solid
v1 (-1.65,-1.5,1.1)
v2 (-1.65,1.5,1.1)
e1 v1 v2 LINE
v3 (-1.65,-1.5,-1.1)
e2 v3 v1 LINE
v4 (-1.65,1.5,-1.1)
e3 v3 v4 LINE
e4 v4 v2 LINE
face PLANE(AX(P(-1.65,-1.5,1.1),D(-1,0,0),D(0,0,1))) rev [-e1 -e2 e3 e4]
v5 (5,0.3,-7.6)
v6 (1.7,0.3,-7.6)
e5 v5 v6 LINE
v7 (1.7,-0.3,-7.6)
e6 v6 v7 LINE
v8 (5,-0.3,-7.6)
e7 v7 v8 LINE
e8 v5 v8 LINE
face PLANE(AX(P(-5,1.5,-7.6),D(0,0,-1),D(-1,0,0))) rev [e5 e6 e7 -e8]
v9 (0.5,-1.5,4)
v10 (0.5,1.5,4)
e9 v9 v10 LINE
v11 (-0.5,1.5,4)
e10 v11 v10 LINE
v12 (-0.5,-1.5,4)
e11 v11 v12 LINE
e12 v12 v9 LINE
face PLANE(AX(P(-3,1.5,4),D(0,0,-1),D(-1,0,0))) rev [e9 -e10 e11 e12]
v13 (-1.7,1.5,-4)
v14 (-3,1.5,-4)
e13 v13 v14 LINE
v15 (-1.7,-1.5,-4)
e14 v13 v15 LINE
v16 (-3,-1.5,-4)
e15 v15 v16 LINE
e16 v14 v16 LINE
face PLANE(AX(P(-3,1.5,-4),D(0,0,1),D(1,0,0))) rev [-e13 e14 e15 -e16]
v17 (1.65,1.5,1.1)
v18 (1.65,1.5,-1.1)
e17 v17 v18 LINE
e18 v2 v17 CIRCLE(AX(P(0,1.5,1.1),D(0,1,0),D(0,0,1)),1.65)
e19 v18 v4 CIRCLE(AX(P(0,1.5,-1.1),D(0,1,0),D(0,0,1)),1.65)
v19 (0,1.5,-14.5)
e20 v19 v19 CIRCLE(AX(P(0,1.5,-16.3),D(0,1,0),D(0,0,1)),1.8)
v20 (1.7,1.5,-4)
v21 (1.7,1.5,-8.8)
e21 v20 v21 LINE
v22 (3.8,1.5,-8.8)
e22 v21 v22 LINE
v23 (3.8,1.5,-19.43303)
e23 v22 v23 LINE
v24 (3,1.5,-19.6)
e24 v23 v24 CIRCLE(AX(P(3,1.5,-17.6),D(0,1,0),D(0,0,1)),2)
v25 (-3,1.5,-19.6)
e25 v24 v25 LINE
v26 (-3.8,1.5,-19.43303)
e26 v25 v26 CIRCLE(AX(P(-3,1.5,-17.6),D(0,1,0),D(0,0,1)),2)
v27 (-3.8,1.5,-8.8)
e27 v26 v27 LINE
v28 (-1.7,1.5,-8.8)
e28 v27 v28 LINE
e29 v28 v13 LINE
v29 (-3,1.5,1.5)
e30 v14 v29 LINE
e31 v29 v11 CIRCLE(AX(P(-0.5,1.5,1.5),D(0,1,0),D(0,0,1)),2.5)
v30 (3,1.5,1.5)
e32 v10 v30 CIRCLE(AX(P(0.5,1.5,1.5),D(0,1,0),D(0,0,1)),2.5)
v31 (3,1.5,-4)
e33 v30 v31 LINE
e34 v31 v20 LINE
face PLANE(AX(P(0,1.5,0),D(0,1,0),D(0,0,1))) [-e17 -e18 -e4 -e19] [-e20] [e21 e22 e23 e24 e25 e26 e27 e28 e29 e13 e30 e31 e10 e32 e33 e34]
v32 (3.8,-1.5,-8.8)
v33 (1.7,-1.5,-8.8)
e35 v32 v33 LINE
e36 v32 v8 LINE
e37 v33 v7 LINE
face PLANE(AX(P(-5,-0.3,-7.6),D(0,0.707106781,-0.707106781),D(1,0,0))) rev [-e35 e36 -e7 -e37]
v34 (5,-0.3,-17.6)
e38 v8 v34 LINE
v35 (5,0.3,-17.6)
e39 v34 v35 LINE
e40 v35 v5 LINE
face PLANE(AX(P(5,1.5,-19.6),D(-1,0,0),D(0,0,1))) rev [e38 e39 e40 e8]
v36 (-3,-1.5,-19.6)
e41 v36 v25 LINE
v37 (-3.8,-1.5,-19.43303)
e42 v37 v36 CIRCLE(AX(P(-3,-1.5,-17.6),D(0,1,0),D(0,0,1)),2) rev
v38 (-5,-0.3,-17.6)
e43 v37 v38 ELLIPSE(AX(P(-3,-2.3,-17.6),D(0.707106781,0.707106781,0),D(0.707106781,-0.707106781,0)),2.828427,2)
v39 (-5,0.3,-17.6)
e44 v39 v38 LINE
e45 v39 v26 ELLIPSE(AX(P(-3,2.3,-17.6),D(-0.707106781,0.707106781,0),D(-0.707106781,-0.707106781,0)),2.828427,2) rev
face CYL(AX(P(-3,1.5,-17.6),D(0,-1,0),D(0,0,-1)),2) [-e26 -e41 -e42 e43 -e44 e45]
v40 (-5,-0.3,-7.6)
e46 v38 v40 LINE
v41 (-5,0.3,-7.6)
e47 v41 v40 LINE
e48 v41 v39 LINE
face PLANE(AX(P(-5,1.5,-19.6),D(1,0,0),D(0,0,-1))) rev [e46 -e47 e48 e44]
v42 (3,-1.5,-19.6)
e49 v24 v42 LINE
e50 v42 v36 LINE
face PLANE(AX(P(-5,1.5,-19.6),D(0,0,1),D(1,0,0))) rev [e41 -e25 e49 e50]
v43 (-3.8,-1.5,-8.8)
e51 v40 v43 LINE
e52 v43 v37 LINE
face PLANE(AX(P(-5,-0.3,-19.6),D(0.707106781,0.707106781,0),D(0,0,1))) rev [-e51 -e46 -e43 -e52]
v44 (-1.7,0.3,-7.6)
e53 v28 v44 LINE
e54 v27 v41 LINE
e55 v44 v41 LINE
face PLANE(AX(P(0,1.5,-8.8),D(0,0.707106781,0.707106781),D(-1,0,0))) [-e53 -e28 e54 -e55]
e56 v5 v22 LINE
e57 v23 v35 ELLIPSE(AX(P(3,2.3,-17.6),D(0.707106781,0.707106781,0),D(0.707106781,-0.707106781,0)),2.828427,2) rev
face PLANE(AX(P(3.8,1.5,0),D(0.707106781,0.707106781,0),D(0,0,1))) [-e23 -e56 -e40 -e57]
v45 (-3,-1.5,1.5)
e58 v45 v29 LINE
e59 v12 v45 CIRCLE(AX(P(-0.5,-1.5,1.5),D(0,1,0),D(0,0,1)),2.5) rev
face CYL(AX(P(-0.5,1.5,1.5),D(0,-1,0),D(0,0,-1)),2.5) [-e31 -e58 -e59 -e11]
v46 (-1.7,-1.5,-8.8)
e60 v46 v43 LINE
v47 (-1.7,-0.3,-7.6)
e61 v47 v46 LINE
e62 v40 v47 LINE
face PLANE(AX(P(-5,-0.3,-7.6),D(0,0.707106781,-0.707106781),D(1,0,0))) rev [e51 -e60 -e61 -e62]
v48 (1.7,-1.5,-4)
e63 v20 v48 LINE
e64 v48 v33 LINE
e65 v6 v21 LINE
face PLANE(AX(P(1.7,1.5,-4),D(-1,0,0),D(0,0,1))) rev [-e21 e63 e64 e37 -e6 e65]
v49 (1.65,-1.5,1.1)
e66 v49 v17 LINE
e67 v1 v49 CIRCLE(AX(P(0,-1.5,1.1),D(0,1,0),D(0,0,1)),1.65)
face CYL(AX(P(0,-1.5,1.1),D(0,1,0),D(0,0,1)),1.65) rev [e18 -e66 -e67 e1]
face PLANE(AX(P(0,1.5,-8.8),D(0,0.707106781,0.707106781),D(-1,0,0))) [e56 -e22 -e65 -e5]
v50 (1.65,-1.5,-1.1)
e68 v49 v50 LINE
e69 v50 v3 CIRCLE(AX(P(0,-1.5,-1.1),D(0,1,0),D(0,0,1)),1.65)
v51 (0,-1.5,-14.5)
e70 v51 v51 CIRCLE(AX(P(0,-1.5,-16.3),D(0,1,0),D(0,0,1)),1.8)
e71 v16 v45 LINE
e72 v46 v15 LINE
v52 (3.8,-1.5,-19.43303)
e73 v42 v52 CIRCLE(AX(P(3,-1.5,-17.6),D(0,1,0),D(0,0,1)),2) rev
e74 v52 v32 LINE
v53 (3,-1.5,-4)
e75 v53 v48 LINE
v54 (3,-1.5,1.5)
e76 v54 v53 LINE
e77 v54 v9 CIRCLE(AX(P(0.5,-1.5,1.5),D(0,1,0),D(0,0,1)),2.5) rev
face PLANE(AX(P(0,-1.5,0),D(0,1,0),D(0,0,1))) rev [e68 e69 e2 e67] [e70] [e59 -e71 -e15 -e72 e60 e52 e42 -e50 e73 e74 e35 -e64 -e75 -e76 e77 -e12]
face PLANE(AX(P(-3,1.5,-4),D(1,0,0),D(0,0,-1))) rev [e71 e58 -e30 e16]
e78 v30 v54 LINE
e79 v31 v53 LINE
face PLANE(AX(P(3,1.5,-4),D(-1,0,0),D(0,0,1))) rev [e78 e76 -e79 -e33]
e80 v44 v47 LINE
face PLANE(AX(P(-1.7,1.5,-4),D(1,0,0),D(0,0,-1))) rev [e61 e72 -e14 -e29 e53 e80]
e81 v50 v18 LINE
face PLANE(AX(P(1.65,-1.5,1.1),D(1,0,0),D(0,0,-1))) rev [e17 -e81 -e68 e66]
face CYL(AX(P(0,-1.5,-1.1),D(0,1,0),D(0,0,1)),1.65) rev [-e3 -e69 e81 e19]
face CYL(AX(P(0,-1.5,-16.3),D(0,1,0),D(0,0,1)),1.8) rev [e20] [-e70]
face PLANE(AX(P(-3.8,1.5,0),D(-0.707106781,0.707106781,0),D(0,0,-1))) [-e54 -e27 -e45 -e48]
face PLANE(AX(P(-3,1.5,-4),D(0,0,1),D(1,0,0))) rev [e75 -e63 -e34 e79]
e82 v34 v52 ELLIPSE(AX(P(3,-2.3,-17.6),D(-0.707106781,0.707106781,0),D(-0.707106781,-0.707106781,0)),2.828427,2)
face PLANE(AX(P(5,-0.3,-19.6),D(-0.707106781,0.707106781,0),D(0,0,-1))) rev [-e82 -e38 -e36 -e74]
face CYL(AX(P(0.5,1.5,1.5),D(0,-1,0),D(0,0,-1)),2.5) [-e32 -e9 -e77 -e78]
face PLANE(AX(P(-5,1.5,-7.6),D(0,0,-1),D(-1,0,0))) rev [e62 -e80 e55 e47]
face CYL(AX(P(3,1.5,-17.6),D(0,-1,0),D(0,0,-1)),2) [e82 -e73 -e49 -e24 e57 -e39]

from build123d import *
from OCP.BRepFilletAPI import BRepFilletAPI_MakeFillet

# Parameters (mm, degrees)
SKETCH1_W               = 6
SKETCH1_H               = 8
BOSS_EXTRUDE1_DEPTH     = 1.5
SKETCH2_W               = 3.4
SKETCH2_H               = 3.6
BOSS_EXTRUDE2_DEPTH     = 1.5
SKETCH3_W               = 10
SKETCH3_H               = 12
BOSS_EXTRUDE3_DEPTH     = 1.5
FILLET1_R1              = 2
FILLET1_R2              = 2.5
CUT_EXTRUDE2_DEPTH      = 21.283244316
CUT_EXTRUDE2_DEPTH_BACK = 21.283244316
SKETCH5_R               = 1.8
CHAMFER3_SIZE           = 1.2


with BuildPart() as part:
    # Sketch1 → Boss-Extrude1 (new, symmetric)
    with BuildSketch(Plane(origin=(0, 0, 0), x_dir=(1, 0, 0), z_dir=(0, 1, 0))):
        Rectangle(SKETCH1_W, SKETCH1_H)
    extrude(amount=BOSS_EXTRUDE1_DEPTH, both=True)

    # Sketch2 → Boss-Extrude2 (add, symmetric)
    with BuildSketch(Plane(origin=(0, 0, 0), x_dir=(1, 0, 0), z_dir=(0, 1, 0))):
        with Locations((0, 5.8)):
            Rectangle(SKETCH2_W, SKETCH2_H)
    extrude(amount=BOSS_EXTRUDE2_DEPTH, both=True)

    # Sketch3 → Boss-Extrude3 (add, symmetric)
    with BuildSketch(Plane(origin=(0, 0, 0), x_dir=(1, 0, 0), z_dir=(0, 1, 0))):
        with Locations((0, 13.6)):
            Rectangle(SKETCH3_W, SKETCH3_H)
    extrude(amount=BOSS_EXTRUDE3_DEPTH, both=True)

    # Fillet1: one fillet with a radius per group of edges: ONE call of the kernel's fillet builder (fillet() takes one radius for all edges)
    fillet1_edges_1 = [part.edges().sort_by_distance(p)[0] for p in [
        (-5, 0, -19.6),
        (5, 0, -19.6),
    ]]
    fillet1_edges_2 = [part.edges().sort_by_distance(p)[0] for p in [
        (-3, 0, 4),
        (3, 0, 4),
    ]]
    fillet1 = BRepFilletAPI_MakeFillet(part.part.solid().wrapped)
    for e in fillet1_edges_1:
        fillet1.Add(FILLET1_R1, e.wrapped)
    for e in fillet1_edges_2:
        fillet1.Add(FILLET1_R2, e.wrapped)
    add(Compound.cast(fillet1.Shape()), mode=Mode.REPLACE)

    # Sketch5 → Cut-Extrude2 (cut, two sides: drawn at the far end of the back side and taken through both)
    with BuildSketch(Plane(origin=(0, 0, 0), x_dir=(1, 0, 0), z_dir=(0, 1, 0)).offset(-CUT_EXTRUDE2_DEPTH_BACK)):
        with Locations(Location((0, 16.3, 0), (0, 0, 270))):
            Circle(SKETCH5_R)
        with BuildLine():
            Line((-1.65, -1.1), (-1.65, 1.1))
            ThreePointArc((-1.65, 1.1), (0, 2.75), (1.65, 1.1))
            Line((1.65, 1.1), (1.65, -1.1))
            ThreePointArc((1.65, -1.1), (0, -2.75), (-1.65, -1.1))
        make_face()
    extrude(amount=CUT_EXTRUDE2_DEPTH + CUT_EXTRUDE2_DEPTH_BACK, mode=Mode.SUBTRACT)

    # Chamfer3
    # the kernel refuses this chamfer: 1.2 mm, written as the material it takes off along each edge
    with BuildSketch(Plane(origin=(8.086019586, -1.5, -7.6), x_dir=(0, 0.9996219169112968, 0.027495876610586632), z_dir=(-1, 0, 0)), Plane(origin=(-1.7, -1.5, -7.6), x_dir=(0, 0.9996219169112968, 0.027495876610586632), z_dir=(-1, 0, 0)), Plane(origin=(-1.7, 1.5, -7.6), x_dir=(0, 0.027495876610586483, -0.9996219169112968), z_dir=(-1, 0, 0)), Plane(origin=(8.086019586, 1.5, -7.6), x_dir=(0, 0.027495876610586483, -0.9996219169112968), z_dir=(-1, 0, 0))) as chamfer3_piece_1:
        Polygon((CHAMFER3_SIZE * 0.999621916911, CHAMFER3_SIZE * 0.0274958766106), (-CHAMFER3_SIZE * 0.0274958766106, CHAMFER3_SIZE * 0.999621916911), (0, 0), align=None)
    extrude(amount=6.386019586, mode=Mode.SUBTRACT)
    with BuildSketch(Plane(origin=(5, -1.5, -20.686019586), x_dir=(0.027495876610586632, 0.9996219169112968, 0), z_dir=(0, 0, 1)), Plane(origin=(5, 1.5, -20.686019586), x_dir=(-0.9996219169112968, 0.027495876610586452, 0), z_dir=(0, 0, 1)), Plane(origin=(-5, -1.5, -4.513980414), x_dir=(-0.027495876610586632, 0.9996219169112968, 0), z_dir=(0, 0, -1)), Plane(origin=(-5, 1.5, -4.513980414), x_dir=(0.9996219169112968, 0.027495876610586452, 0), z_dir=(0, 0, -1))) as chamfer3_piece_2:
        Polygon((CHAMFER3_SIZE * 0.999621916911, CHAMFER3_SIZE * 0.0274958766106), (-CHAMFER3_SIZE * 0.0274958766106, CHAMFER3_SIZE * 0.999621916911), (0, 0), align=None)
    extrude(amount=16.172039171, mode=Mode.SUBTRACT)


solid = part.part
